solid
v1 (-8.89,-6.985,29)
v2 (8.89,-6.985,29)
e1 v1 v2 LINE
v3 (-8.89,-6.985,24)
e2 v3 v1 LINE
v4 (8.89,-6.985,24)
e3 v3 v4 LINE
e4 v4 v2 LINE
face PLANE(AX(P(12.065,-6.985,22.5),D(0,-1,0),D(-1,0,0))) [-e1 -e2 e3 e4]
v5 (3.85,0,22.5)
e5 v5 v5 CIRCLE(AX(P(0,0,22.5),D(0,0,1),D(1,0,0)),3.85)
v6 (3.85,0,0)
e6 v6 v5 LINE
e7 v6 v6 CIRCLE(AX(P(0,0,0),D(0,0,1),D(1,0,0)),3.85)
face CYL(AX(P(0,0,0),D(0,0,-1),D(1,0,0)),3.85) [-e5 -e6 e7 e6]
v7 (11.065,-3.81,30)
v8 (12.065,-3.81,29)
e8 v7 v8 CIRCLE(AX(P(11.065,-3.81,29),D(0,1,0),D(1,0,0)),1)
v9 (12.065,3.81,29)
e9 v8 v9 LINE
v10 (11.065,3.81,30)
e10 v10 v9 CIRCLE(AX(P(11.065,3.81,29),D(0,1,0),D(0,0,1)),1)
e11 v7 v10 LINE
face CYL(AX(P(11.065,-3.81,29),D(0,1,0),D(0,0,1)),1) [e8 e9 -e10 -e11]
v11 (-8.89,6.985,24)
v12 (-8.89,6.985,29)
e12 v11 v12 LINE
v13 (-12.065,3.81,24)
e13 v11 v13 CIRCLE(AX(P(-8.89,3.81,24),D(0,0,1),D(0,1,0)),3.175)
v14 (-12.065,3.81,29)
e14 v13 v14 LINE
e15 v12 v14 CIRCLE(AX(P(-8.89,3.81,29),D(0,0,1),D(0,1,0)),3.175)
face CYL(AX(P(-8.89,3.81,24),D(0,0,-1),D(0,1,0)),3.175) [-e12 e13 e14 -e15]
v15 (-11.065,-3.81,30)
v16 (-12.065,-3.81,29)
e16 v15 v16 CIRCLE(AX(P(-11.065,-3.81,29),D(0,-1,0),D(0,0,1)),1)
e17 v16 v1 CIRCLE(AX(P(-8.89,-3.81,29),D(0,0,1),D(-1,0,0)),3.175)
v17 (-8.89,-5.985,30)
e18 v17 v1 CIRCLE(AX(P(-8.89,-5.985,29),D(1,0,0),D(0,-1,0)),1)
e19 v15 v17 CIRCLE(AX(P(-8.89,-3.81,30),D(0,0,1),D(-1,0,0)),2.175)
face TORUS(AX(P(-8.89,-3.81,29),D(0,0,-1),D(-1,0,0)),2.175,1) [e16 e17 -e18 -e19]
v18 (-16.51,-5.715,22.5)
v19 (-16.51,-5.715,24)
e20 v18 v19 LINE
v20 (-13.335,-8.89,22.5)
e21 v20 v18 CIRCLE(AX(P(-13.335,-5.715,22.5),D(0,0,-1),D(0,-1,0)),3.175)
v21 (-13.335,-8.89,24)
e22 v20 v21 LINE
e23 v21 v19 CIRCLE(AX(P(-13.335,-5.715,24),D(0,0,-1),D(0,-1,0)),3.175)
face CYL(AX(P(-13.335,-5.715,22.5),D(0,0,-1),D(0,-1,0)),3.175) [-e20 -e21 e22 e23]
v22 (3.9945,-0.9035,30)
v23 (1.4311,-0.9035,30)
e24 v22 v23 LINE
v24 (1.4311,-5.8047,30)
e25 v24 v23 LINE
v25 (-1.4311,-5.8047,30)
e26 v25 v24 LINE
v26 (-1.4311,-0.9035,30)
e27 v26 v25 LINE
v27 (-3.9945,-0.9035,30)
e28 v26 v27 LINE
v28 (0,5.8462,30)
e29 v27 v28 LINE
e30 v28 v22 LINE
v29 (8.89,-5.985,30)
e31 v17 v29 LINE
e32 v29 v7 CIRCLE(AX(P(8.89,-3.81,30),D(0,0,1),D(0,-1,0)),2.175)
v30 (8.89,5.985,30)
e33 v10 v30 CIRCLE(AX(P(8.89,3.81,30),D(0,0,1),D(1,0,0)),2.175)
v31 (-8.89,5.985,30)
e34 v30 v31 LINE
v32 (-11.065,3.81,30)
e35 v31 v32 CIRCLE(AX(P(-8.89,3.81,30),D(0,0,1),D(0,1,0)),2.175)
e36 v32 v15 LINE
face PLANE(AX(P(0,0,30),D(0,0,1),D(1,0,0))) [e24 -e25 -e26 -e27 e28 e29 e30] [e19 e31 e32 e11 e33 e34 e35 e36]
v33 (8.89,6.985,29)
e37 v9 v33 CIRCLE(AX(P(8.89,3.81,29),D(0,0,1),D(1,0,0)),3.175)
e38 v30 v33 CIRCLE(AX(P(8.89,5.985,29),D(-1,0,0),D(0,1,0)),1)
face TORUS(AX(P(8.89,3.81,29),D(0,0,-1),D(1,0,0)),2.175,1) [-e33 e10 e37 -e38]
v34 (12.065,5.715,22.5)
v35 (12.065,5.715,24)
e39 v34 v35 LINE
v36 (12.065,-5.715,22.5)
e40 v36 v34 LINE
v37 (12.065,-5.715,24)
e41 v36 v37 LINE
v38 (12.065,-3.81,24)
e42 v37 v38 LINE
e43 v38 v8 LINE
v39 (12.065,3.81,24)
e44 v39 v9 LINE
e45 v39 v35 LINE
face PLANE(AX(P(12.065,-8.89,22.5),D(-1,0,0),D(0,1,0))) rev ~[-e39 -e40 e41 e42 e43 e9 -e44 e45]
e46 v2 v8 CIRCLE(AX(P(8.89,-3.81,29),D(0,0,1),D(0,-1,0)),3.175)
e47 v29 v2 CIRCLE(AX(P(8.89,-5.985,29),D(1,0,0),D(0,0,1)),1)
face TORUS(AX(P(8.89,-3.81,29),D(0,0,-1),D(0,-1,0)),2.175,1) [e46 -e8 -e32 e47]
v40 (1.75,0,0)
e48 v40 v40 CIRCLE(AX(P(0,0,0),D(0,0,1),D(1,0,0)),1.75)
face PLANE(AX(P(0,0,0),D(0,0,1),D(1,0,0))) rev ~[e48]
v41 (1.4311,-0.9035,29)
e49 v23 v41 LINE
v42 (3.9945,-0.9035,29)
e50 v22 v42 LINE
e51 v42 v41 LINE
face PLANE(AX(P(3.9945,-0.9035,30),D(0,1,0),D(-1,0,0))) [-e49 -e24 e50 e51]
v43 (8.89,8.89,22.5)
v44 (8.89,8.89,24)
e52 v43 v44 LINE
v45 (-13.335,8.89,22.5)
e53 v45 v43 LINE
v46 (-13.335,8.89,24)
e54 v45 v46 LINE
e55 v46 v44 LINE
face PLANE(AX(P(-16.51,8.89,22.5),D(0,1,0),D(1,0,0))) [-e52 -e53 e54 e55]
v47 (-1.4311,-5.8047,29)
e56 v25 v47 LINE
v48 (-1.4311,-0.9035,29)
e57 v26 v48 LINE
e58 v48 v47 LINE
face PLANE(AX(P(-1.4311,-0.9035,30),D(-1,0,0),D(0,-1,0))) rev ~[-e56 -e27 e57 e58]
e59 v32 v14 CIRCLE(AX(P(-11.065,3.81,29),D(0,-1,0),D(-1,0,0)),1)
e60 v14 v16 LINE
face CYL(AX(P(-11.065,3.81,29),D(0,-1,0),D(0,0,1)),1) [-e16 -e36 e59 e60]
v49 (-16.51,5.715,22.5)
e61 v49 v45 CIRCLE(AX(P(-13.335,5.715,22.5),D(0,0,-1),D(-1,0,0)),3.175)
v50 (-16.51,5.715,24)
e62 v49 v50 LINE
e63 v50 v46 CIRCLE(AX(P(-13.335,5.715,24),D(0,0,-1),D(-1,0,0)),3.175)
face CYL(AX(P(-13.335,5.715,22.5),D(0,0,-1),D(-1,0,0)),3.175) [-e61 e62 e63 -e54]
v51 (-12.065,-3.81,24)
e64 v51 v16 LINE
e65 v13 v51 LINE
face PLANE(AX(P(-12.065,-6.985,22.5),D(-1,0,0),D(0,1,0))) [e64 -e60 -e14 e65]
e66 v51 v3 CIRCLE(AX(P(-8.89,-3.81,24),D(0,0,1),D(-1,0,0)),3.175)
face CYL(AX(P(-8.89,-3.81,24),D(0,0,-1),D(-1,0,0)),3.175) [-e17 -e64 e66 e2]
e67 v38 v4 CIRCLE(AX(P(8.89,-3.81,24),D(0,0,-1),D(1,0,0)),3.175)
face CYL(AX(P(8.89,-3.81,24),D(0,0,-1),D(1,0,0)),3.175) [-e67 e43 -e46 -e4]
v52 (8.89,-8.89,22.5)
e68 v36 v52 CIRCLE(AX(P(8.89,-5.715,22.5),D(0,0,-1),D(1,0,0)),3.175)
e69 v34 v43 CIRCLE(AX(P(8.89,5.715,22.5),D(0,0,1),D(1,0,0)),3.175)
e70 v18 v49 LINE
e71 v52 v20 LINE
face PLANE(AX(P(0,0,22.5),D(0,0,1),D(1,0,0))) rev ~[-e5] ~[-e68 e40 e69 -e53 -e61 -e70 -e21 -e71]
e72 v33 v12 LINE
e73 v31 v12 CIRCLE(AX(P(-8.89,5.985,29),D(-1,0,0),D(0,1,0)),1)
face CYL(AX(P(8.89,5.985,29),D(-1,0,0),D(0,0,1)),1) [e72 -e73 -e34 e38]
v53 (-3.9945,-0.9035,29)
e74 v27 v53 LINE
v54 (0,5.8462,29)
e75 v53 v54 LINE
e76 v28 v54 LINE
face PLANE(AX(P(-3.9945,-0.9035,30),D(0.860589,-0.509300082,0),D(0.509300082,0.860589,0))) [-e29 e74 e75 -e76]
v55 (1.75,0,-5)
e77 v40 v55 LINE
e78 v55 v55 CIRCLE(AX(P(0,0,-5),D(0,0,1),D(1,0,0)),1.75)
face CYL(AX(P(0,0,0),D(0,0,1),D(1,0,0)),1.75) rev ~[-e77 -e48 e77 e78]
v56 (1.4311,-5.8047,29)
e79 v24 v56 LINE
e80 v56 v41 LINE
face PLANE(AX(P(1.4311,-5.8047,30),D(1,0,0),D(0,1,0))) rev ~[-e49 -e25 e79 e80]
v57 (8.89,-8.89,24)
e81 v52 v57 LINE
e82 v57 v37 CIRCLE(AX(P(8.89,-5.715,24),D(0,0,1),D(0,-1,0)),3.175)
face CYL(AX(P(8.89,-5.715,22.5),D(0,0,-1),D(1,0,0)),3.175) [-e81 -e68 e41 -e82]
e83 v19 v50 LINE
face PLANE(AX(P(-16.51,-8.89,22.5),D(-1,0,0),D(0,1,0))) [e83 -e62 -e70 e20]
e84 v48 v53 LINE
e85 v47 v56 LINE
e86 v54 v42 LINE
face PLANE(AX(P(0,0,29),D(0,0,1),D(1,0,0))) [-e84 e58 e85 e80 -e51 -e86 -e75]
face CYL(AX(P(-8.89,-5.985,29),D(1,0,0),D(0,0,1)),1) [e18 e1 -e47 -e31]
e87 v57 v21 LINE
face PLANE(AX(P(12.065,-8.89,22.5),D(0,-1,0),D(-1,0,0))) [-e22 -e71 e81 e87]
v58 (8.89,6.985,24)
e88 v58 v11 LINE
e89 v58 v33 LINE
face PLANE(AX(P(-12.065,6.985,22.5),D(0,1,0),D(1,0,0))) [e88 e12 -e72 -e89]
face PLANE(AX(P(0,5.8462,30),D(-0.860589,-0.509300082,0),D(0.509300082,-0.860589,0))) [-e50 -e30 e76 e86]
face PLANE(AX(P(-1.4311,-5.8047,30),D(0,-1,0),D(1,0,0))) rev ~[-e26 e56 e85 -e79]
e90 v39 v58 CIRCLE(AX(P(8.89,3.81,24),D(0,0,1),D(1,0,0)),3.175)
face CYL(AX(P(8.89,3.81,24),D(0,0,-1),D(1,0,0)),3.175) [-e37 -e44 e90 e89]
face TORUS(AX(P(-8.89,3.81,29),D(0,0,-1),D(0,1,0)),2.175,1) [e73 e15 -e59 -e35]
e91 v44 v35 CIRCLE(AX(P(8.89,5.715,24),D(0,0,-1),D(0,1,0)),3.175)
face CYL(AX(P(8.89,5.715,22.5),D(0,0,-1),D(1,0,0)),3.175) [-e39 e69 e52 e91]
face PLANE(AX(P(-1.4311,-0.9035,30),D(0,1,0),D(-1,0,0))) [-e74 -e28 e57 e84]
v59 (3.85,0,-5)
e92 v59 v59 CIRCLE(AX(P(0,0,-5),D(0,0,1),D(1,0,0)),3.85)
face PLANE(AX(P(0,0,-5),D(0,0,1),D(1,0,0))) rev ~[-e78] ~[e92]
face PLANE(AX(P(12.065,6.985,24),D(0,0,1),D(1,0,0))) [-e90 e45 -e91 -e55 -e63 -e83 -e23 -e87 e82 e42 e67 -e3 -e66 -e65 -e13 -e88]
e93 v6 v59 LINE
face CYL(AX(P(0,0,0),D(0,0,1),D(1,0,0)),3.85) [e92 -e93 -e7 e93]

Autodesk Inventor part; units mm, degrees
ref_plane "YZ Plane" through (0, 0, 0) normal (1, 0, 0) x (0, 1, 0)
ref_plane "XZ Plane" through (0, 0, 0) normal (0, 1, 0) x (-1, 0, 0)
ref_plane "XY Plane" through (0, 0, 0) normal (0, 0, 1) x (1, 0, 0)
sketch "Sketch1" plane through (0, 0, 0) normal (0, 0, 1) x (1, 0, 0)
  circle A0 centre (0, 0) radius 1.75 projected
  circle A1 centre (0, 0) radius 1.85
  circle A2 centre (0, 0) radius 3.85
  point P0 (0, 0)
  dimension "d0" = 0.1
  dimension "d1" = 2
extrude "Extrusion1" add sketch "Sketch1" against normal blind 5 contours A1 | A2
sketch "Sketch2" plane through (0, 0, 0) normal (0, 0, 1) x (1, 0, 0)
  point P0 (0, 0)
sketch "Sketch3" plane through (0, 0, 0) normal (0, 0, 1) x (1, 0, 0)
  circle A0 centre (0, 0) radius 3.85
extrude "Extrusion2" add sketch "Sketch3" along normal blind 22.5
sketch "Sketch4" plane through (0, 0, 22.5) normal (0, 0, 1) x (1, 0, 0)
  line L0 (12.065, -6.985) -> (-12.065, -6.985)
  line L1 (-12.065, -6.985) -> (-12.065, 6.985)
  line L2 (-12.065, 6.985) -> (12.065, 6.985)
  line L3 (12.065, 6.985) -> (12.065, -6.985)
  circle A0 centre (0, 0) radius 1.85 projected
  line L4 (12.065, -6.985) -> (-12.065, 6.985) construction
  line L5 (-12.065, -6.985) -> (12.065, 6.985) construction
  line L6 (12.065, 12.065) -> (-12.065, 12.065) construction
  line L7 (-12.065, 12.065) -> (-12.065, 26.035) construction
  line L8 (-12.065, 26.035) -> (12.065, 26.035) construction
  line L9 (12.065, 26.035) -> (12.065, 12.065) construction
  line L10 (12.065, 12.065) -> (-12.065, 26.035) construction
  line L11 (-12.065, 12.065) -> (12.065, 26.035) construction
  line L12 (12.065, -8.89) -> (-16.51, -8.89)
  line L13 (-16.51, -8.89) -> (-16.51, 8.89)
  line L14 (-16.51, 8.89) -> (12.065, 8.89)
  line L15 (16.51, -8.89) -> (-16.51, 8.89) construction
  line L16 (-16.51, -8.89) -> (12.065, 6.4965) construction
  line L17 (12.065, -8.89) -> (12.065, 8.89)
  point P0 (0, 0)
  point P1 (0, 19.05)
  dimension "d6" = 24.13
  dimension "d7" = 13.97
  dimension "d10" = 19.05
  dimension "d16" = 17.78
extrude "Extrusion3" add sketch "Sketch4" along normal blind 1.5 contours L17 L12 L13 L14 L2 L1 L0 | L0 L1 L2 L3 | A0
extrude "Extrusion4" add sketch "Sketch4" along normal blind 7.5 contours L0 L1 L2 L3 | A0
fillet "Fillet1" radius 3.175 8 edges at (-12.065, 6.985, 27) (12.065, 6.985, 27) (12.065, -6.985, 27) (-12.065, -6.985, 27) (-16.51, -8.89, 23.25) (12.065, 8.89, 23.25) (-16.51, 8.89, 23.25) (12.065, -8.89, 23.25)
sketch "Sketch5" plane through (0, 0, 30) normal (0, 0, 1) x (1, 0, 0)
  line L0 (0, 5.8462) -> (-3.9945, -0.9035)
  line L1 (3.9945, -0.9035) -> (0, 5.8462)
  line L2 (1.4311, -0.9035) -> (1.4311, -5.8047)
  line L3 (1.4311, -5.8047) -> (-1.4311, -5.8047)
  line L4 (-1.4311, -5.8047) -> (-1.4311, -0.9035)
  line L5 (8.89, 6.985) -> (-8.89, 6.985)
  arc A0 (8.89, -6.985) -> (12.065, -3.81) centre (8.89, -3.81) ccw
  line L6 (-8.89, -6.985) -> (8.89, -6.985)
  arc A1 (-12.065, -3.81) -> (-8.89, -6.985) centre (-8.89, -3.81) ccw
  arc A2 (-8.89, 6.985) -> (-12.065, 3.81) centre (-8.89, 3.81) ccw
  line L7 (-12.065, 3.81) -> (-12.065, -3.81)
  arc A3 (12.065, 3.81) -> (8.89, 6.985) centre (8.89, 3.81) ccw
  line L8 (12.065, -3.81) -> (12.065, 3.81)
  line L9 (-3.9945, -0.9035) -> (-1.4311, -0.9035)
  line L10 (1.4311, -0.9035) -> (3.9945, -0.9035)
  point P0 (0, 0)
  point P1 (0, 0)
  point P2 (0, -0.9035)
  point P3 (0, 6.985)
emboss "Emboss1" sketch "Sketch5" operation cut depth 1 direction (0, 0, -1) contours L1 L10 L2 L3 L4 L9 L0
fillet "Fillet2" radius 1 8 edges at (-11.1351, 6.0551, 30) (-12.065, 0, 30) (-11.1351, -6.0551, 30) (0, -6.985, 30) (11.1351, -6.0551, 30) (12.065, 0, 30) (11.1351, 6.0551, 30) (0, 6.985, 30)
properties part number "Button Cover"
